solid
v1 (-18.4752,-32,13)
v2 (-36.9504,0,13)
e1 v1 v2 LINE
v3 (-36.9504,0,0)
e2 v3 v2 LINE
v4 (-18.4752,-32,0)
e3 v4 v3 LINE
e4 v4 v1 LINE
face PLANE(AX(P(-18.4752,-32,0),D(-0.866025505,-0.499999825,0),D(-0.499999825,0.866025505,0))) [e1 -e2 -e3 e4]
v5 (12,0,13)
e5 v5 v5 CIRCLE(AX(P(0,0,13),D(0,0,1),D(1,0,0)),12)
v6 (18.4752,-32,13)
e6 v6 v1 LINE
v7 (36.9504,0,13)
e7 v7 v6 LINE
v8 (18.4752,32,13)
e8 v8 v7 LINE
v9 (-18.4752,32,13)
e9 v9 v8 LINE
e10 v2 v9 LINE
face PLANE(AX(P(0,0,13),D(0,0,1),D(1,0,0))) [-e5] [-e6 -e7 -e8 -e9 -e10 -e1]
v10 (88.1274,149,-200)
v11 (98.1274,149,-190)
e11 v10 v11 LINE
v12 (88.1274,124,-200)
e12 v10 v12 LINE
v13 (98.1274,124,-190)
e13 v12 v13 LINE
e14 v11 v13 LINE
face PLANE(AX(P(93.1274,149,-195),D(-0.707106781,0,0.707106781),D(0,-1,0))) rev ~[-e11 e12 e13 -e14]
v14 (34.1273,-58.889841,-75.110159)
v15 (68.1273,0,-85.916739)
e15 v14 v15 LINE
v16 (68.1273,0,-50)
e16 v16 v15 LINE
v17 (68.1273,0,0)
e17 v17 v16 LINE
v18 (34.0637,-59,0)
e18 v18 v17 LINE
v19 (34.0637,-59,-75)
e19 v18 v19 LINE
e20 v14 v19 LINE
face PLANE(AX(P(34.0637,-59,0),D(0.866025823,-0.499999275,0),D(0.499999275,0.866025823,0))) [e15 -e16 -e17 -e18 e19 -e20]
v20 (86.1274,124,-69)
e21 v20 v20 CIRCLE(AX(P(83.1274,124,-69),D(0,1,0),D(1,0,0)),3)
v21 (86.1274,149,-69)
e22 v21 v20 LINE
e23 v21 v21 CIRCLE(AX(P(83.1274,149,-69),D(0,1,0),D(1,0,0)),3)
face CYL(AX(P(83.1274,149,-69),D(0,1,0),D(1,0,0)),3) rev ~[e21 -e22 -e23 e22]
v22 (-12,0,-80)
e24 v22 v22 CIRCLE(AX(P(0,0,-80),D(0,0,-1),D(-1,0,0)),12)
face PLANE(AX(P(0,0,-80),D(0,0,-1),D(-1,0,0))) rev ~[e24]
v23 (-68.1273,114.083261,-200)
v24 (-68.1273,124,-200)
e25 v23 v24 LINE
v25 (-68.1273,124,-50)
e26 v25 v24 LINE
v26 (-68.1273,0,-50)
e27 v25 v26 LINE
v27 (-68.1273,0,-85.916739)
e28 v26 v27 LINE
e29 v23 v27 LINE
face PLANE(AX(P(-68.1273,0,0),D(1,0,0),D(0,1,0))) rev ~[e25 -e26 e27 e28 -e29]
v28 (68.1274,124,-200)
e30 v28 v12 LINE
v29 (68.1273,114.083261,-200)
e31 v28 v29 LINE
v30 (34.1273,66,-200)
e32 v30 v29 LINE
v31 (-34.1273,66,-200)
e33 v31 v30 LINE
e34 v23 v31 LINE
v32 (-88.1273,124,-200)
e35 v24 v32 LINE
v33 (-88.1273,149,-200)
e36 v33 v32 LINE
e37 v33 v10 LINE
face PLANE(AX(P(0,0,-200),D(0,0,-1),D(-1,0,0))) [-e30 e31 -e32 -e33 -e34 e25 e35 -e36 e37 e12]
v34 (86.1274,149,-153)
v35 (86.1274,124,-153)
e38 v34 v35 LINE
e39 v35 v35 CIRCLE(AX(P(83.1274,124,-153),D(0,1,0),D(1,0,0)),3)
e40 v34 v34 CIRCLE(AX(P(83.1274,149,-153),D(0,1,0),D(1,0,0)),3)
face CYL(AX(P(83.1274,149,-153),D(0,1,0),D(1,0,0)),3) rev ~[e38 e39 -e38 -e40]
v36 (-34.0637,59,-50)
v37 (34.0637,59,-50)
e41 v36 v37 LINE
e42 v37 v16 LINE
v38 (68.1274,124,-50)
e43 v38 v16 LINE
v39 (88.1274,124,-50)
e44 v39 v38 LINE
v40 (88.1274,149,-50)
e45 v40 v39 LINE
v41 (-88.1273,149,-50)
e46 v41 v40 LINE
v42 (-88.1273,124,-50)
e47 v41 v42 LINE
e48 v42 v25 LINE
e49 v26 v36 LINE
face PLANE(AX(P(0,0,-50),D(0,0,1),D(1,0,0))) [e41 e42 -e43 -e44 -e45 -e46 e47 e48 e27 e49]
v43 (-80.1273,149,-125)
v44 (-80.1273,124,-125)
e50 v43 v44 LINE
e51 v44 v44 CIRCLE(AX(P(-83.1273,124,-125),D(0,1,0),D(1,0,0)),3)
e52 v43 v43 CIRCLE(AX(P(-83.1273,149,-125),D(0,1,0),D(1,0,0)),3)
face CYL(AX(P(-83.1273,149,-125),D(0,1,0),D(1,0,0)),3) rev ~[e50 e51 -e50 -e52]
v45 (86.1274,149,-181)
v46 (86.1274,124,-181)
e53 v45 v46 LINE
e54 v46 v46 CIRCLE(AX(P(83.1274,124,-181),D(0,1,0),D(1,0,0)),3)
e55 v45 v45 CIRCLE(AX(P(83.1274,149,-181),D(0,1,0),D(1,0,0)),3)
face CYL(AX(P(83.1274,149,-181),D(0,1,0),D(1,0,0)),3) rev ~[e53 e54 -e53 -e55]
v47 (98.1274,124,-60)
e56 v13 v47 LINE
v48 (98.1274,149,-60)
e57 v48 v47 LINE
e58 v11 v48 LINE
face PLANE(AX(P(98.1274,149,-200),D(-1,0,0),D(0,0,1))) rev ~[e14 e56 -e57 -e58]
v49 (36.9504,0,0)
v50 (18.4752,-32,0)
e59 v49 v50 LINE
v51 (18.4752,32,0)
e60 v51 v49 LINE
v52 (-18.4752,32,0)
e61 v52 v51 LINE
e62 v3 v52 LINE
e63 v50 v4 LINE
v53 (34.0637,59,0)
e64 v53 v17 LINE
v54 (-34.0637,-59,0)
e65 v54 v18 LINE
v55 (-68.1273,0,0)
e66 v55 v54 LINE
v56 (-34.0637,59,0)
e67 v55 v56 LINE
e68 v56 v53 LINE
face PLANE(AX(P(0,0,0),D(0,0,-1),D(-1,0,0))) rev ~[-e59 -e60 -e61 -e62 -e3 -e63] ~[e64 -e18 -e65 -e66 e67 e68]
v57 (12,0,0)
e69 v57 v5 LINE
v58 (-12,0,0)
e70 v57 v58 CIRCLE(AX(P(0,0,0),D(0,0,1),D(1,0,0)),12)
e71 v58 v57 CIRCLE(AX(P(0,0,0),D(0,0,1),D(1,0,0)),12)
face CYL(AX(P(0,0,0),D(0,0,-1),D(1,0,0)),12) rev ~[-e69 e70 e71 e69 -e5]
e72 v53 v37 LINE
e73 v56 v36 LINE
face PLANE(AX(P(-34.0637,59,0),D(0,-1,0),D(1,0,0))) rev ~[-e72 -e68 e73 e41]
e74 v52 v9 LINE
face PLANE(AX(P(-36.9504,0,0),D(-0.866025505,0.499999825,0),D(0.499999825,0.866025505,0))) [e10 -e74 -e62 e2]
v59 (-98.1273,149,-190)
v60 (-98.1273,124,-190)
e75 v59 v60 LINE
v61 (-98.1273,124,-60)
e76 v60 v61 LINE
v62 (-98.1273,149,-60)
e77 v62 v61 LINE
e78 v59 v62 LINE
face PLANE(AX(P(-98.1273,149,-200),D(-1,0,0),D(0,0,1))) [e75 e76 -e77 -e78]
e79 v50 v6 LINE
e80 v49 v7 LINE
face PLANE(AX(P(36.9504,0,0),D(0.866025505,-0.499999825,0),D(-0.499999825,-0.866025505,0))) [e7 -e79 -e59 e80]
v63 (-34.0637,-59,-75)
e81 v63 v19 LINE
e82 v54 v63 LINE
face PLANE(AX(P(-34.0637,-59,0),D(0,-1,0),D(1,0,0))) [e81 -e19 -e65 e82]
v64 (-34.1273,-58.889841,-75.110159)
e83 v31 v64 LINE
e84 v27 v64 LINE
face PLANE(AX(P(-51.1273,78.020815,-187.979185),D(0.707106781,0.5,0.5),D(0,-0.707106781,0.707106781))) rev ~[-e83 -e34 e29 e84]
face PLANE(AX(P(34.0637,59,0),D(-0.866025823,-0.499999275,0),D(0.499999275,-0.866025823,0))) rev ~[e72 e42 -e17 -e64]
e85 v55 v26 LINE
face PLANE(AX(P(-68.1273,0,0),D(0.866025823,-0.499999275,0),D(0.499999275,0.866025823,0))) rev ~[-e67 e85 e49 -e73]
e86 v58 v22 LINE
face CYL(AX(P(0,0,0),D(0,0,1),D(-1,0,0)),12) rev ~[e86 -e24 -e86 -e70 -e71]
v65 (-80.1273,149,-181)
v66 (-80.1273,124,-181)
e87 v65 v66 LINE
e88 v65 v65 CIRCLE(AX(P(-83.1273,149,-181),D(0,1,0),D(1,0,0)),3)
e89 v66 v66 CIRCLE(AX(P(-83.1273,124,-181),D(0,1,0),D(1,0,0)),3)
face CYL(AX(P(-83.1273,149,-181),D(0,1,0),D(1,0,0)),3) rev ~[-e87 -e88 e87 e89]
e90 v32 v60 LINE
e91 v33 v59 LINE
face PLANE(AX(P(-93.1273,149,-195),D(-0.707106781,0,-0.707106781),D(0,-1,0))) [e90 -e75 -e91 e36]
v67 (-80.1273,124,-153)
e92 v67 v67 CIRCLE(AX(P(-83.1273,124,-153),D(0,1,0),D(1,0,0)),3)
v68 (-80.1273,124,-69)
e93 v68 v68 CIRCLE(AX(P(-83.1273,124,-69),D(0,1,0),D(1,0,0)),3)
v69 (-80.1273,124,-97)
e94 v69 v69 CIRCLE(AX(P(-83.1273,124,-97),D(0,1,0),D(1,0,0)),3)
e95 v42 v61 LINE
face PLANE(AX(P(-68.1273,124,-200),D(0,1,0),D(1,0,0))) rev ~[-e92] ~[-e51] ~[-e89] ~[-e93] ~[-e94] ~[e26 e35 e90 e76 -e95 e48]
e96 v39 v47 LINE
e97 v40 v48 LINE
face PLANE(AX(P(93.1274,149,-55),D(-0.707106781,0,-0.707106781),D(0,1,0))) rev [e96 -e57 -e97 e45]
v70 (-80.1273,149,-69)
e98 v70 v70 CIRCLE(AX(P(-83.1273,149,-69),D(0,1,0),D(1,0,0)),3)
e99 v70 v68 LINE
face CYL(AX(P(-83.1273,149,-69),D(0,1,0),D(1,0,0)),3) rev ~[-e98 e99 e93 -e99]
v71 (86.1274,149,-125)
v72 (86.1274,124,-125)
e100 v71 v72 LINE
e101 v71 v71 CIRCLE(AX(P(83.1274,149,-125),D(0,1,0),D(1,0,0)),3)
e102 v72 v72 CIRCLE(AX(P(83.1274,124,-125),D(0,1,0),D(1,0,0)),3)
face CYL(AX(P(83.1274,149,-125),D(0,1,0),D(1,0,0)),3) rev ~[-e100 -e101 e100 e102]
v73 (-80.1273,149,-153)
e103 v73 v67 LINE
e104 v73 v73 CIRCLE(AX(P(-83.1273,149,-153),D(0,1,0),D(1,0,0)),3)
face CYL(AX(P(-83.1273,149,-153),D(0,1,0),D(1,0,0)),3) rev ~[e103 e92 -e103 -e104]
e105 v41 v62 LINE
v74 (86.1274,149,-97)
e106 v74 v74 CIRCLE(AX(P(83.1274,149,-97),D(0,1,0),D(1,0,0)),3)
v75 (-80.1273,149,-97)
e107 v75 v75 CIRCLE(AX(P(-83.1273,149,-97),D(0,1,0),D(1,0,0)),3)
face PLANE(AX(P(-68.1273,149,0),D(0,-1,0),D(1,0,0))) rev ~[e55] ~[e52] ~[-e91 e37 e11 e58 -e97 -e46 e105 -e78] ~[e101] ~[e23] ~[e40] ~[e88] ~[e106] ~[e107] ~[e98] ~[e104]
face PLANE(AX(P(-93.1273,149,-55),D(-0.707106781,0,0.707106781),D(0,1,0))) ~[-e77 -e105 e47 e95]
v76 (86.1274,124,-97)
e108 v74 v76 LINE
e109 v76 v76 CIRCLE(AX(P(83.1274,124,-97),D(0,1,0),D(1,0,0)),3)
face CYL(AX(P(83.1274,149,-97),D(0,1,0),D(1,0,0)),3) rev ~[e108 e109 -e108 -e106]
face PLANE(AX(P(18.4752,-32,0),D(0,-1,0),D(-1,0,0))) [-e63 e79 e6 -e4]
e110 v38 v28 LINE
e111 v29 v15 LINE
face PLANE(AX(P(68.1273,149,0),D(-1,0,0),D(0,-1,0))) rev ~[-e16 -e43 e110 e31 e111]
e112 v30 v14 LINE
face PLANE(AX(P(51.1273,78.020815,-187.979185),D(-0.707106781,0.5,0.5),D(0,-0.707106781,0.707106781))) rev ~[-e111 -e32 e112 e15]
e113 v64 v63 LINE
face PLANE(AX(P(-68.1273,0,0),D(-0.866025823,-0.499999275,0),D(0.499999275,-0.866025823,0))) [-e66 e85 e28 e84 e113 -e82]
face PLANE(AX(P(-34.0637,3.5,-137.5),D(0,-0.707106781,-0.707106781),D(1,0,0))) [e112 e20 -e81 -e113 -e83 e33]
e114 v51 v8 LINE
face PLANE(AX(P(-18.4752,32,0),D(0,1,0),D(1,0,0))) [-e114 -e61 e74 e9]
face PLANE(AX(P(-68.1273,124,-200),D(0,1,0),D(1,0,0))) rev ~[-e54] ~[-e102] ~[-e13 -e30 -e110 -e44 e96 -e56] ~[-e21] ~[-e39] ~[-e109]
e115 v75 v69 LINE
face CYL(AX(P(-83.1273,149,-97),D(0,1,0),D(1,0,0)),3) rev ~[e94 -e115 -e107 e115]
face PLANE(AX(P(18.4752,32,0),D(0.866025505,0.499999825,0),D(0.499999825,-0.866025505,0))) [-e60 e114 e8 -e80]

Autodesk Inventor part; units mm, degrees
ref_plane "YZ Plane" through (0, 0, 0) normal (1, 0, 0) x (0, 1, 0)
ref_plane "XZ Plane" through (0, 0, 0) normal (0, 1, 0) x (-1, 0, 0)
ref_plane "XY Plane" through (0, 0, 0) normal (0, 0, 1) x (1, 0, 0)
sketch "Sketch1" plane through (0, 0, 0) normal (0, 0, 1) x (1, 0, 0)
  line L0 (-36.9504, 0) -> (-18.4752, 32)
  line L1 (-18.4752, 32) -> (18.4752, 32)
  line L2 (18.4752, 32) -> (36.9504, 0)
  line L3 (36.9504, 0) -> (18.4752, -32)
  line L4 (18.4752, -32) -> (-18.4752, -32)
  line L5 (-18.4752, -32) -> (-36.9504, 0)
  circle A0 centre (0, 0) radius 12
  dimension "d0" = 64
  dimension "d1" = 24
extrude "Extrusion1" add sketch "Sketch1" along normal blind 13
sketch "Sketch2" plane through (0, 0, 0) normal (0, 0, -1) x (-1, 0, 0)
  line L0 (68.1273, 0) -> (34.0637, -59)
  line L1 (34.0637, -59) -> (-34.0637, -59)
  line L2 (-34.0637, -59) -> (-68.1273, 0)
  line L3 (-68.1273, 0) -> (-34.0637, 59)
  line L4 (-34.0637, 59) -> (34.0637, 59)
  line L5 (34.0637, 59) -> (68.1273, 0)
  circle A0 centre (0, 0) radius 12 projected
  line L6 (68.1273, 0) -> (68.1273, 149)
  line L7 (68.1273, 149) -> (-68.1273, 149)
  line L8 (-68.1273, 149) -> (-68.1273, 0)
  dimension "d4" = 118
  dimension "d8" = 90
extrude "Extrusion2" add sketch "Sketch2" along normal blind 200
sketch "Sketch3" plane through (0, 0, -200) normal (0, 0, -1) x (-1, 0, 0)
  circle A0 centre (0, 0) radius 12 projected
extrude "Extrusion3" add sketch "Sketch3" against normal blind 120
sketch "Sketch4" plane through (0, 0, 0) normal (0, 0, 1) x (1, 0, 0)
  line L0 (68.1273, 0) -> (34.0637, -59)
  line L1 (34.0637, -59) -> (-34.0637, -59) construction
  line L2 (-34.0637, -59) -> (-68.1273, 0)
  line L3 (-68.1273, 0) -> (-34.0637, 59)
  line L4 (-34.0637, 59) -> (34.0637, 59)
  line L5 (34.0637, 59) -> (68.1273, 0)
  line L6 (68.1273, 0) -> (34.0637, -59) projected
  line L7 (68.1273, 149) -> (68.1273, 0) projected
  line L8 (68.1273, 0) -> (68.1273, 149)
  line L9 (-68.1273, 149) -> (68.1273, 149) projected
  line L10 (68.1273, 149) -> (-68.1273, 149)
  line L11 (-68.1273, 149) -> (-68.1273, 0)
  point P0 (0, 0)
  point P1 (0, 0)
extrude "Extrusion4" cut sketch "Sketch4" against normal blind 50
chamfer "Chamfer1" distance 125 angle 45 1 edges at (0, -59, -200)
chamfer "Chamfer2" distance 34 angle 45 2 edges at (-68.1273, 33, -167) (68.1273, 33, -167)
sketch "Sketch5" plane through (-68.1273, 149, -200) normal (0, 1, 0) x (1, 0, 0)
  line L0 (0, -150) -> (0, 0) projected
  line L1 (0, 0) -> (-30, 0)
  line L2 (-30, 0) -> (-30, -150)
  line L3 (-30, -150) -> (0, -150)
  line L4 (0, -150) -> (0, 0)
  line L5 (0, 0) -> (136.2547, 0) projected
  line L6 (136.2547, 0) -> (166.2547, 0)
  line L7 (166.2547, 0) -> (166.2547, -150)
  line L8 (166.2547, -150) -> (136.2547, -150)
  line L9 (136.2547, -150) -> (136.2547, 0)
  circle A0 centre (151.2547, -131) radius 3
  circle A1 centre (151.2547, -103) radius 3
  circle A2 centre (151.2547, -75) radius 3
  circle A3 centre (151.2547, -47) radius 3
  circle A4 centre (151.2547, -19) radius 3
  line L10 (68.1273, -200) -> (68.1273, -239.5833)
  line L11 (0, 0) -> (-30, 0)
  line L12 (-30, 0) -> (-30, -150)
  line L13 (-30, -150) -> (0, -150)
  line L14 (0, -150) -> (0, 0)
  circle A5 centre (-15, -131) radius 3
  circle A6 centre (-15, -103) radius 3
  circle A7 centre (-15, -75) radius 3
  circle A8 centre (-15, -47) radius 3
  circle A9 centre (-15, -19) radius 3
  point P0 (151.2547, -150)
  point P1 (0, -150)
  point P2 (-15, -150)
  dimension "d19" = 30
  dimension "d20" = 30
  dimension "d21" = 6
  dimension "d22" = 19
  dimension "d25" = 28
extrude "Extrusion5" add sketch "Sketch5" against normal blind 25
chamfer "Chamfer4" distance 10 angle 45 4 edges at (98.1273, 136.5, -50) (-98.1273, 136.5, -50) (98.1273, 136.5, -200) (-98.1273, 136.5, -200)
properties part number "BA30" material "ABS Plastic"
